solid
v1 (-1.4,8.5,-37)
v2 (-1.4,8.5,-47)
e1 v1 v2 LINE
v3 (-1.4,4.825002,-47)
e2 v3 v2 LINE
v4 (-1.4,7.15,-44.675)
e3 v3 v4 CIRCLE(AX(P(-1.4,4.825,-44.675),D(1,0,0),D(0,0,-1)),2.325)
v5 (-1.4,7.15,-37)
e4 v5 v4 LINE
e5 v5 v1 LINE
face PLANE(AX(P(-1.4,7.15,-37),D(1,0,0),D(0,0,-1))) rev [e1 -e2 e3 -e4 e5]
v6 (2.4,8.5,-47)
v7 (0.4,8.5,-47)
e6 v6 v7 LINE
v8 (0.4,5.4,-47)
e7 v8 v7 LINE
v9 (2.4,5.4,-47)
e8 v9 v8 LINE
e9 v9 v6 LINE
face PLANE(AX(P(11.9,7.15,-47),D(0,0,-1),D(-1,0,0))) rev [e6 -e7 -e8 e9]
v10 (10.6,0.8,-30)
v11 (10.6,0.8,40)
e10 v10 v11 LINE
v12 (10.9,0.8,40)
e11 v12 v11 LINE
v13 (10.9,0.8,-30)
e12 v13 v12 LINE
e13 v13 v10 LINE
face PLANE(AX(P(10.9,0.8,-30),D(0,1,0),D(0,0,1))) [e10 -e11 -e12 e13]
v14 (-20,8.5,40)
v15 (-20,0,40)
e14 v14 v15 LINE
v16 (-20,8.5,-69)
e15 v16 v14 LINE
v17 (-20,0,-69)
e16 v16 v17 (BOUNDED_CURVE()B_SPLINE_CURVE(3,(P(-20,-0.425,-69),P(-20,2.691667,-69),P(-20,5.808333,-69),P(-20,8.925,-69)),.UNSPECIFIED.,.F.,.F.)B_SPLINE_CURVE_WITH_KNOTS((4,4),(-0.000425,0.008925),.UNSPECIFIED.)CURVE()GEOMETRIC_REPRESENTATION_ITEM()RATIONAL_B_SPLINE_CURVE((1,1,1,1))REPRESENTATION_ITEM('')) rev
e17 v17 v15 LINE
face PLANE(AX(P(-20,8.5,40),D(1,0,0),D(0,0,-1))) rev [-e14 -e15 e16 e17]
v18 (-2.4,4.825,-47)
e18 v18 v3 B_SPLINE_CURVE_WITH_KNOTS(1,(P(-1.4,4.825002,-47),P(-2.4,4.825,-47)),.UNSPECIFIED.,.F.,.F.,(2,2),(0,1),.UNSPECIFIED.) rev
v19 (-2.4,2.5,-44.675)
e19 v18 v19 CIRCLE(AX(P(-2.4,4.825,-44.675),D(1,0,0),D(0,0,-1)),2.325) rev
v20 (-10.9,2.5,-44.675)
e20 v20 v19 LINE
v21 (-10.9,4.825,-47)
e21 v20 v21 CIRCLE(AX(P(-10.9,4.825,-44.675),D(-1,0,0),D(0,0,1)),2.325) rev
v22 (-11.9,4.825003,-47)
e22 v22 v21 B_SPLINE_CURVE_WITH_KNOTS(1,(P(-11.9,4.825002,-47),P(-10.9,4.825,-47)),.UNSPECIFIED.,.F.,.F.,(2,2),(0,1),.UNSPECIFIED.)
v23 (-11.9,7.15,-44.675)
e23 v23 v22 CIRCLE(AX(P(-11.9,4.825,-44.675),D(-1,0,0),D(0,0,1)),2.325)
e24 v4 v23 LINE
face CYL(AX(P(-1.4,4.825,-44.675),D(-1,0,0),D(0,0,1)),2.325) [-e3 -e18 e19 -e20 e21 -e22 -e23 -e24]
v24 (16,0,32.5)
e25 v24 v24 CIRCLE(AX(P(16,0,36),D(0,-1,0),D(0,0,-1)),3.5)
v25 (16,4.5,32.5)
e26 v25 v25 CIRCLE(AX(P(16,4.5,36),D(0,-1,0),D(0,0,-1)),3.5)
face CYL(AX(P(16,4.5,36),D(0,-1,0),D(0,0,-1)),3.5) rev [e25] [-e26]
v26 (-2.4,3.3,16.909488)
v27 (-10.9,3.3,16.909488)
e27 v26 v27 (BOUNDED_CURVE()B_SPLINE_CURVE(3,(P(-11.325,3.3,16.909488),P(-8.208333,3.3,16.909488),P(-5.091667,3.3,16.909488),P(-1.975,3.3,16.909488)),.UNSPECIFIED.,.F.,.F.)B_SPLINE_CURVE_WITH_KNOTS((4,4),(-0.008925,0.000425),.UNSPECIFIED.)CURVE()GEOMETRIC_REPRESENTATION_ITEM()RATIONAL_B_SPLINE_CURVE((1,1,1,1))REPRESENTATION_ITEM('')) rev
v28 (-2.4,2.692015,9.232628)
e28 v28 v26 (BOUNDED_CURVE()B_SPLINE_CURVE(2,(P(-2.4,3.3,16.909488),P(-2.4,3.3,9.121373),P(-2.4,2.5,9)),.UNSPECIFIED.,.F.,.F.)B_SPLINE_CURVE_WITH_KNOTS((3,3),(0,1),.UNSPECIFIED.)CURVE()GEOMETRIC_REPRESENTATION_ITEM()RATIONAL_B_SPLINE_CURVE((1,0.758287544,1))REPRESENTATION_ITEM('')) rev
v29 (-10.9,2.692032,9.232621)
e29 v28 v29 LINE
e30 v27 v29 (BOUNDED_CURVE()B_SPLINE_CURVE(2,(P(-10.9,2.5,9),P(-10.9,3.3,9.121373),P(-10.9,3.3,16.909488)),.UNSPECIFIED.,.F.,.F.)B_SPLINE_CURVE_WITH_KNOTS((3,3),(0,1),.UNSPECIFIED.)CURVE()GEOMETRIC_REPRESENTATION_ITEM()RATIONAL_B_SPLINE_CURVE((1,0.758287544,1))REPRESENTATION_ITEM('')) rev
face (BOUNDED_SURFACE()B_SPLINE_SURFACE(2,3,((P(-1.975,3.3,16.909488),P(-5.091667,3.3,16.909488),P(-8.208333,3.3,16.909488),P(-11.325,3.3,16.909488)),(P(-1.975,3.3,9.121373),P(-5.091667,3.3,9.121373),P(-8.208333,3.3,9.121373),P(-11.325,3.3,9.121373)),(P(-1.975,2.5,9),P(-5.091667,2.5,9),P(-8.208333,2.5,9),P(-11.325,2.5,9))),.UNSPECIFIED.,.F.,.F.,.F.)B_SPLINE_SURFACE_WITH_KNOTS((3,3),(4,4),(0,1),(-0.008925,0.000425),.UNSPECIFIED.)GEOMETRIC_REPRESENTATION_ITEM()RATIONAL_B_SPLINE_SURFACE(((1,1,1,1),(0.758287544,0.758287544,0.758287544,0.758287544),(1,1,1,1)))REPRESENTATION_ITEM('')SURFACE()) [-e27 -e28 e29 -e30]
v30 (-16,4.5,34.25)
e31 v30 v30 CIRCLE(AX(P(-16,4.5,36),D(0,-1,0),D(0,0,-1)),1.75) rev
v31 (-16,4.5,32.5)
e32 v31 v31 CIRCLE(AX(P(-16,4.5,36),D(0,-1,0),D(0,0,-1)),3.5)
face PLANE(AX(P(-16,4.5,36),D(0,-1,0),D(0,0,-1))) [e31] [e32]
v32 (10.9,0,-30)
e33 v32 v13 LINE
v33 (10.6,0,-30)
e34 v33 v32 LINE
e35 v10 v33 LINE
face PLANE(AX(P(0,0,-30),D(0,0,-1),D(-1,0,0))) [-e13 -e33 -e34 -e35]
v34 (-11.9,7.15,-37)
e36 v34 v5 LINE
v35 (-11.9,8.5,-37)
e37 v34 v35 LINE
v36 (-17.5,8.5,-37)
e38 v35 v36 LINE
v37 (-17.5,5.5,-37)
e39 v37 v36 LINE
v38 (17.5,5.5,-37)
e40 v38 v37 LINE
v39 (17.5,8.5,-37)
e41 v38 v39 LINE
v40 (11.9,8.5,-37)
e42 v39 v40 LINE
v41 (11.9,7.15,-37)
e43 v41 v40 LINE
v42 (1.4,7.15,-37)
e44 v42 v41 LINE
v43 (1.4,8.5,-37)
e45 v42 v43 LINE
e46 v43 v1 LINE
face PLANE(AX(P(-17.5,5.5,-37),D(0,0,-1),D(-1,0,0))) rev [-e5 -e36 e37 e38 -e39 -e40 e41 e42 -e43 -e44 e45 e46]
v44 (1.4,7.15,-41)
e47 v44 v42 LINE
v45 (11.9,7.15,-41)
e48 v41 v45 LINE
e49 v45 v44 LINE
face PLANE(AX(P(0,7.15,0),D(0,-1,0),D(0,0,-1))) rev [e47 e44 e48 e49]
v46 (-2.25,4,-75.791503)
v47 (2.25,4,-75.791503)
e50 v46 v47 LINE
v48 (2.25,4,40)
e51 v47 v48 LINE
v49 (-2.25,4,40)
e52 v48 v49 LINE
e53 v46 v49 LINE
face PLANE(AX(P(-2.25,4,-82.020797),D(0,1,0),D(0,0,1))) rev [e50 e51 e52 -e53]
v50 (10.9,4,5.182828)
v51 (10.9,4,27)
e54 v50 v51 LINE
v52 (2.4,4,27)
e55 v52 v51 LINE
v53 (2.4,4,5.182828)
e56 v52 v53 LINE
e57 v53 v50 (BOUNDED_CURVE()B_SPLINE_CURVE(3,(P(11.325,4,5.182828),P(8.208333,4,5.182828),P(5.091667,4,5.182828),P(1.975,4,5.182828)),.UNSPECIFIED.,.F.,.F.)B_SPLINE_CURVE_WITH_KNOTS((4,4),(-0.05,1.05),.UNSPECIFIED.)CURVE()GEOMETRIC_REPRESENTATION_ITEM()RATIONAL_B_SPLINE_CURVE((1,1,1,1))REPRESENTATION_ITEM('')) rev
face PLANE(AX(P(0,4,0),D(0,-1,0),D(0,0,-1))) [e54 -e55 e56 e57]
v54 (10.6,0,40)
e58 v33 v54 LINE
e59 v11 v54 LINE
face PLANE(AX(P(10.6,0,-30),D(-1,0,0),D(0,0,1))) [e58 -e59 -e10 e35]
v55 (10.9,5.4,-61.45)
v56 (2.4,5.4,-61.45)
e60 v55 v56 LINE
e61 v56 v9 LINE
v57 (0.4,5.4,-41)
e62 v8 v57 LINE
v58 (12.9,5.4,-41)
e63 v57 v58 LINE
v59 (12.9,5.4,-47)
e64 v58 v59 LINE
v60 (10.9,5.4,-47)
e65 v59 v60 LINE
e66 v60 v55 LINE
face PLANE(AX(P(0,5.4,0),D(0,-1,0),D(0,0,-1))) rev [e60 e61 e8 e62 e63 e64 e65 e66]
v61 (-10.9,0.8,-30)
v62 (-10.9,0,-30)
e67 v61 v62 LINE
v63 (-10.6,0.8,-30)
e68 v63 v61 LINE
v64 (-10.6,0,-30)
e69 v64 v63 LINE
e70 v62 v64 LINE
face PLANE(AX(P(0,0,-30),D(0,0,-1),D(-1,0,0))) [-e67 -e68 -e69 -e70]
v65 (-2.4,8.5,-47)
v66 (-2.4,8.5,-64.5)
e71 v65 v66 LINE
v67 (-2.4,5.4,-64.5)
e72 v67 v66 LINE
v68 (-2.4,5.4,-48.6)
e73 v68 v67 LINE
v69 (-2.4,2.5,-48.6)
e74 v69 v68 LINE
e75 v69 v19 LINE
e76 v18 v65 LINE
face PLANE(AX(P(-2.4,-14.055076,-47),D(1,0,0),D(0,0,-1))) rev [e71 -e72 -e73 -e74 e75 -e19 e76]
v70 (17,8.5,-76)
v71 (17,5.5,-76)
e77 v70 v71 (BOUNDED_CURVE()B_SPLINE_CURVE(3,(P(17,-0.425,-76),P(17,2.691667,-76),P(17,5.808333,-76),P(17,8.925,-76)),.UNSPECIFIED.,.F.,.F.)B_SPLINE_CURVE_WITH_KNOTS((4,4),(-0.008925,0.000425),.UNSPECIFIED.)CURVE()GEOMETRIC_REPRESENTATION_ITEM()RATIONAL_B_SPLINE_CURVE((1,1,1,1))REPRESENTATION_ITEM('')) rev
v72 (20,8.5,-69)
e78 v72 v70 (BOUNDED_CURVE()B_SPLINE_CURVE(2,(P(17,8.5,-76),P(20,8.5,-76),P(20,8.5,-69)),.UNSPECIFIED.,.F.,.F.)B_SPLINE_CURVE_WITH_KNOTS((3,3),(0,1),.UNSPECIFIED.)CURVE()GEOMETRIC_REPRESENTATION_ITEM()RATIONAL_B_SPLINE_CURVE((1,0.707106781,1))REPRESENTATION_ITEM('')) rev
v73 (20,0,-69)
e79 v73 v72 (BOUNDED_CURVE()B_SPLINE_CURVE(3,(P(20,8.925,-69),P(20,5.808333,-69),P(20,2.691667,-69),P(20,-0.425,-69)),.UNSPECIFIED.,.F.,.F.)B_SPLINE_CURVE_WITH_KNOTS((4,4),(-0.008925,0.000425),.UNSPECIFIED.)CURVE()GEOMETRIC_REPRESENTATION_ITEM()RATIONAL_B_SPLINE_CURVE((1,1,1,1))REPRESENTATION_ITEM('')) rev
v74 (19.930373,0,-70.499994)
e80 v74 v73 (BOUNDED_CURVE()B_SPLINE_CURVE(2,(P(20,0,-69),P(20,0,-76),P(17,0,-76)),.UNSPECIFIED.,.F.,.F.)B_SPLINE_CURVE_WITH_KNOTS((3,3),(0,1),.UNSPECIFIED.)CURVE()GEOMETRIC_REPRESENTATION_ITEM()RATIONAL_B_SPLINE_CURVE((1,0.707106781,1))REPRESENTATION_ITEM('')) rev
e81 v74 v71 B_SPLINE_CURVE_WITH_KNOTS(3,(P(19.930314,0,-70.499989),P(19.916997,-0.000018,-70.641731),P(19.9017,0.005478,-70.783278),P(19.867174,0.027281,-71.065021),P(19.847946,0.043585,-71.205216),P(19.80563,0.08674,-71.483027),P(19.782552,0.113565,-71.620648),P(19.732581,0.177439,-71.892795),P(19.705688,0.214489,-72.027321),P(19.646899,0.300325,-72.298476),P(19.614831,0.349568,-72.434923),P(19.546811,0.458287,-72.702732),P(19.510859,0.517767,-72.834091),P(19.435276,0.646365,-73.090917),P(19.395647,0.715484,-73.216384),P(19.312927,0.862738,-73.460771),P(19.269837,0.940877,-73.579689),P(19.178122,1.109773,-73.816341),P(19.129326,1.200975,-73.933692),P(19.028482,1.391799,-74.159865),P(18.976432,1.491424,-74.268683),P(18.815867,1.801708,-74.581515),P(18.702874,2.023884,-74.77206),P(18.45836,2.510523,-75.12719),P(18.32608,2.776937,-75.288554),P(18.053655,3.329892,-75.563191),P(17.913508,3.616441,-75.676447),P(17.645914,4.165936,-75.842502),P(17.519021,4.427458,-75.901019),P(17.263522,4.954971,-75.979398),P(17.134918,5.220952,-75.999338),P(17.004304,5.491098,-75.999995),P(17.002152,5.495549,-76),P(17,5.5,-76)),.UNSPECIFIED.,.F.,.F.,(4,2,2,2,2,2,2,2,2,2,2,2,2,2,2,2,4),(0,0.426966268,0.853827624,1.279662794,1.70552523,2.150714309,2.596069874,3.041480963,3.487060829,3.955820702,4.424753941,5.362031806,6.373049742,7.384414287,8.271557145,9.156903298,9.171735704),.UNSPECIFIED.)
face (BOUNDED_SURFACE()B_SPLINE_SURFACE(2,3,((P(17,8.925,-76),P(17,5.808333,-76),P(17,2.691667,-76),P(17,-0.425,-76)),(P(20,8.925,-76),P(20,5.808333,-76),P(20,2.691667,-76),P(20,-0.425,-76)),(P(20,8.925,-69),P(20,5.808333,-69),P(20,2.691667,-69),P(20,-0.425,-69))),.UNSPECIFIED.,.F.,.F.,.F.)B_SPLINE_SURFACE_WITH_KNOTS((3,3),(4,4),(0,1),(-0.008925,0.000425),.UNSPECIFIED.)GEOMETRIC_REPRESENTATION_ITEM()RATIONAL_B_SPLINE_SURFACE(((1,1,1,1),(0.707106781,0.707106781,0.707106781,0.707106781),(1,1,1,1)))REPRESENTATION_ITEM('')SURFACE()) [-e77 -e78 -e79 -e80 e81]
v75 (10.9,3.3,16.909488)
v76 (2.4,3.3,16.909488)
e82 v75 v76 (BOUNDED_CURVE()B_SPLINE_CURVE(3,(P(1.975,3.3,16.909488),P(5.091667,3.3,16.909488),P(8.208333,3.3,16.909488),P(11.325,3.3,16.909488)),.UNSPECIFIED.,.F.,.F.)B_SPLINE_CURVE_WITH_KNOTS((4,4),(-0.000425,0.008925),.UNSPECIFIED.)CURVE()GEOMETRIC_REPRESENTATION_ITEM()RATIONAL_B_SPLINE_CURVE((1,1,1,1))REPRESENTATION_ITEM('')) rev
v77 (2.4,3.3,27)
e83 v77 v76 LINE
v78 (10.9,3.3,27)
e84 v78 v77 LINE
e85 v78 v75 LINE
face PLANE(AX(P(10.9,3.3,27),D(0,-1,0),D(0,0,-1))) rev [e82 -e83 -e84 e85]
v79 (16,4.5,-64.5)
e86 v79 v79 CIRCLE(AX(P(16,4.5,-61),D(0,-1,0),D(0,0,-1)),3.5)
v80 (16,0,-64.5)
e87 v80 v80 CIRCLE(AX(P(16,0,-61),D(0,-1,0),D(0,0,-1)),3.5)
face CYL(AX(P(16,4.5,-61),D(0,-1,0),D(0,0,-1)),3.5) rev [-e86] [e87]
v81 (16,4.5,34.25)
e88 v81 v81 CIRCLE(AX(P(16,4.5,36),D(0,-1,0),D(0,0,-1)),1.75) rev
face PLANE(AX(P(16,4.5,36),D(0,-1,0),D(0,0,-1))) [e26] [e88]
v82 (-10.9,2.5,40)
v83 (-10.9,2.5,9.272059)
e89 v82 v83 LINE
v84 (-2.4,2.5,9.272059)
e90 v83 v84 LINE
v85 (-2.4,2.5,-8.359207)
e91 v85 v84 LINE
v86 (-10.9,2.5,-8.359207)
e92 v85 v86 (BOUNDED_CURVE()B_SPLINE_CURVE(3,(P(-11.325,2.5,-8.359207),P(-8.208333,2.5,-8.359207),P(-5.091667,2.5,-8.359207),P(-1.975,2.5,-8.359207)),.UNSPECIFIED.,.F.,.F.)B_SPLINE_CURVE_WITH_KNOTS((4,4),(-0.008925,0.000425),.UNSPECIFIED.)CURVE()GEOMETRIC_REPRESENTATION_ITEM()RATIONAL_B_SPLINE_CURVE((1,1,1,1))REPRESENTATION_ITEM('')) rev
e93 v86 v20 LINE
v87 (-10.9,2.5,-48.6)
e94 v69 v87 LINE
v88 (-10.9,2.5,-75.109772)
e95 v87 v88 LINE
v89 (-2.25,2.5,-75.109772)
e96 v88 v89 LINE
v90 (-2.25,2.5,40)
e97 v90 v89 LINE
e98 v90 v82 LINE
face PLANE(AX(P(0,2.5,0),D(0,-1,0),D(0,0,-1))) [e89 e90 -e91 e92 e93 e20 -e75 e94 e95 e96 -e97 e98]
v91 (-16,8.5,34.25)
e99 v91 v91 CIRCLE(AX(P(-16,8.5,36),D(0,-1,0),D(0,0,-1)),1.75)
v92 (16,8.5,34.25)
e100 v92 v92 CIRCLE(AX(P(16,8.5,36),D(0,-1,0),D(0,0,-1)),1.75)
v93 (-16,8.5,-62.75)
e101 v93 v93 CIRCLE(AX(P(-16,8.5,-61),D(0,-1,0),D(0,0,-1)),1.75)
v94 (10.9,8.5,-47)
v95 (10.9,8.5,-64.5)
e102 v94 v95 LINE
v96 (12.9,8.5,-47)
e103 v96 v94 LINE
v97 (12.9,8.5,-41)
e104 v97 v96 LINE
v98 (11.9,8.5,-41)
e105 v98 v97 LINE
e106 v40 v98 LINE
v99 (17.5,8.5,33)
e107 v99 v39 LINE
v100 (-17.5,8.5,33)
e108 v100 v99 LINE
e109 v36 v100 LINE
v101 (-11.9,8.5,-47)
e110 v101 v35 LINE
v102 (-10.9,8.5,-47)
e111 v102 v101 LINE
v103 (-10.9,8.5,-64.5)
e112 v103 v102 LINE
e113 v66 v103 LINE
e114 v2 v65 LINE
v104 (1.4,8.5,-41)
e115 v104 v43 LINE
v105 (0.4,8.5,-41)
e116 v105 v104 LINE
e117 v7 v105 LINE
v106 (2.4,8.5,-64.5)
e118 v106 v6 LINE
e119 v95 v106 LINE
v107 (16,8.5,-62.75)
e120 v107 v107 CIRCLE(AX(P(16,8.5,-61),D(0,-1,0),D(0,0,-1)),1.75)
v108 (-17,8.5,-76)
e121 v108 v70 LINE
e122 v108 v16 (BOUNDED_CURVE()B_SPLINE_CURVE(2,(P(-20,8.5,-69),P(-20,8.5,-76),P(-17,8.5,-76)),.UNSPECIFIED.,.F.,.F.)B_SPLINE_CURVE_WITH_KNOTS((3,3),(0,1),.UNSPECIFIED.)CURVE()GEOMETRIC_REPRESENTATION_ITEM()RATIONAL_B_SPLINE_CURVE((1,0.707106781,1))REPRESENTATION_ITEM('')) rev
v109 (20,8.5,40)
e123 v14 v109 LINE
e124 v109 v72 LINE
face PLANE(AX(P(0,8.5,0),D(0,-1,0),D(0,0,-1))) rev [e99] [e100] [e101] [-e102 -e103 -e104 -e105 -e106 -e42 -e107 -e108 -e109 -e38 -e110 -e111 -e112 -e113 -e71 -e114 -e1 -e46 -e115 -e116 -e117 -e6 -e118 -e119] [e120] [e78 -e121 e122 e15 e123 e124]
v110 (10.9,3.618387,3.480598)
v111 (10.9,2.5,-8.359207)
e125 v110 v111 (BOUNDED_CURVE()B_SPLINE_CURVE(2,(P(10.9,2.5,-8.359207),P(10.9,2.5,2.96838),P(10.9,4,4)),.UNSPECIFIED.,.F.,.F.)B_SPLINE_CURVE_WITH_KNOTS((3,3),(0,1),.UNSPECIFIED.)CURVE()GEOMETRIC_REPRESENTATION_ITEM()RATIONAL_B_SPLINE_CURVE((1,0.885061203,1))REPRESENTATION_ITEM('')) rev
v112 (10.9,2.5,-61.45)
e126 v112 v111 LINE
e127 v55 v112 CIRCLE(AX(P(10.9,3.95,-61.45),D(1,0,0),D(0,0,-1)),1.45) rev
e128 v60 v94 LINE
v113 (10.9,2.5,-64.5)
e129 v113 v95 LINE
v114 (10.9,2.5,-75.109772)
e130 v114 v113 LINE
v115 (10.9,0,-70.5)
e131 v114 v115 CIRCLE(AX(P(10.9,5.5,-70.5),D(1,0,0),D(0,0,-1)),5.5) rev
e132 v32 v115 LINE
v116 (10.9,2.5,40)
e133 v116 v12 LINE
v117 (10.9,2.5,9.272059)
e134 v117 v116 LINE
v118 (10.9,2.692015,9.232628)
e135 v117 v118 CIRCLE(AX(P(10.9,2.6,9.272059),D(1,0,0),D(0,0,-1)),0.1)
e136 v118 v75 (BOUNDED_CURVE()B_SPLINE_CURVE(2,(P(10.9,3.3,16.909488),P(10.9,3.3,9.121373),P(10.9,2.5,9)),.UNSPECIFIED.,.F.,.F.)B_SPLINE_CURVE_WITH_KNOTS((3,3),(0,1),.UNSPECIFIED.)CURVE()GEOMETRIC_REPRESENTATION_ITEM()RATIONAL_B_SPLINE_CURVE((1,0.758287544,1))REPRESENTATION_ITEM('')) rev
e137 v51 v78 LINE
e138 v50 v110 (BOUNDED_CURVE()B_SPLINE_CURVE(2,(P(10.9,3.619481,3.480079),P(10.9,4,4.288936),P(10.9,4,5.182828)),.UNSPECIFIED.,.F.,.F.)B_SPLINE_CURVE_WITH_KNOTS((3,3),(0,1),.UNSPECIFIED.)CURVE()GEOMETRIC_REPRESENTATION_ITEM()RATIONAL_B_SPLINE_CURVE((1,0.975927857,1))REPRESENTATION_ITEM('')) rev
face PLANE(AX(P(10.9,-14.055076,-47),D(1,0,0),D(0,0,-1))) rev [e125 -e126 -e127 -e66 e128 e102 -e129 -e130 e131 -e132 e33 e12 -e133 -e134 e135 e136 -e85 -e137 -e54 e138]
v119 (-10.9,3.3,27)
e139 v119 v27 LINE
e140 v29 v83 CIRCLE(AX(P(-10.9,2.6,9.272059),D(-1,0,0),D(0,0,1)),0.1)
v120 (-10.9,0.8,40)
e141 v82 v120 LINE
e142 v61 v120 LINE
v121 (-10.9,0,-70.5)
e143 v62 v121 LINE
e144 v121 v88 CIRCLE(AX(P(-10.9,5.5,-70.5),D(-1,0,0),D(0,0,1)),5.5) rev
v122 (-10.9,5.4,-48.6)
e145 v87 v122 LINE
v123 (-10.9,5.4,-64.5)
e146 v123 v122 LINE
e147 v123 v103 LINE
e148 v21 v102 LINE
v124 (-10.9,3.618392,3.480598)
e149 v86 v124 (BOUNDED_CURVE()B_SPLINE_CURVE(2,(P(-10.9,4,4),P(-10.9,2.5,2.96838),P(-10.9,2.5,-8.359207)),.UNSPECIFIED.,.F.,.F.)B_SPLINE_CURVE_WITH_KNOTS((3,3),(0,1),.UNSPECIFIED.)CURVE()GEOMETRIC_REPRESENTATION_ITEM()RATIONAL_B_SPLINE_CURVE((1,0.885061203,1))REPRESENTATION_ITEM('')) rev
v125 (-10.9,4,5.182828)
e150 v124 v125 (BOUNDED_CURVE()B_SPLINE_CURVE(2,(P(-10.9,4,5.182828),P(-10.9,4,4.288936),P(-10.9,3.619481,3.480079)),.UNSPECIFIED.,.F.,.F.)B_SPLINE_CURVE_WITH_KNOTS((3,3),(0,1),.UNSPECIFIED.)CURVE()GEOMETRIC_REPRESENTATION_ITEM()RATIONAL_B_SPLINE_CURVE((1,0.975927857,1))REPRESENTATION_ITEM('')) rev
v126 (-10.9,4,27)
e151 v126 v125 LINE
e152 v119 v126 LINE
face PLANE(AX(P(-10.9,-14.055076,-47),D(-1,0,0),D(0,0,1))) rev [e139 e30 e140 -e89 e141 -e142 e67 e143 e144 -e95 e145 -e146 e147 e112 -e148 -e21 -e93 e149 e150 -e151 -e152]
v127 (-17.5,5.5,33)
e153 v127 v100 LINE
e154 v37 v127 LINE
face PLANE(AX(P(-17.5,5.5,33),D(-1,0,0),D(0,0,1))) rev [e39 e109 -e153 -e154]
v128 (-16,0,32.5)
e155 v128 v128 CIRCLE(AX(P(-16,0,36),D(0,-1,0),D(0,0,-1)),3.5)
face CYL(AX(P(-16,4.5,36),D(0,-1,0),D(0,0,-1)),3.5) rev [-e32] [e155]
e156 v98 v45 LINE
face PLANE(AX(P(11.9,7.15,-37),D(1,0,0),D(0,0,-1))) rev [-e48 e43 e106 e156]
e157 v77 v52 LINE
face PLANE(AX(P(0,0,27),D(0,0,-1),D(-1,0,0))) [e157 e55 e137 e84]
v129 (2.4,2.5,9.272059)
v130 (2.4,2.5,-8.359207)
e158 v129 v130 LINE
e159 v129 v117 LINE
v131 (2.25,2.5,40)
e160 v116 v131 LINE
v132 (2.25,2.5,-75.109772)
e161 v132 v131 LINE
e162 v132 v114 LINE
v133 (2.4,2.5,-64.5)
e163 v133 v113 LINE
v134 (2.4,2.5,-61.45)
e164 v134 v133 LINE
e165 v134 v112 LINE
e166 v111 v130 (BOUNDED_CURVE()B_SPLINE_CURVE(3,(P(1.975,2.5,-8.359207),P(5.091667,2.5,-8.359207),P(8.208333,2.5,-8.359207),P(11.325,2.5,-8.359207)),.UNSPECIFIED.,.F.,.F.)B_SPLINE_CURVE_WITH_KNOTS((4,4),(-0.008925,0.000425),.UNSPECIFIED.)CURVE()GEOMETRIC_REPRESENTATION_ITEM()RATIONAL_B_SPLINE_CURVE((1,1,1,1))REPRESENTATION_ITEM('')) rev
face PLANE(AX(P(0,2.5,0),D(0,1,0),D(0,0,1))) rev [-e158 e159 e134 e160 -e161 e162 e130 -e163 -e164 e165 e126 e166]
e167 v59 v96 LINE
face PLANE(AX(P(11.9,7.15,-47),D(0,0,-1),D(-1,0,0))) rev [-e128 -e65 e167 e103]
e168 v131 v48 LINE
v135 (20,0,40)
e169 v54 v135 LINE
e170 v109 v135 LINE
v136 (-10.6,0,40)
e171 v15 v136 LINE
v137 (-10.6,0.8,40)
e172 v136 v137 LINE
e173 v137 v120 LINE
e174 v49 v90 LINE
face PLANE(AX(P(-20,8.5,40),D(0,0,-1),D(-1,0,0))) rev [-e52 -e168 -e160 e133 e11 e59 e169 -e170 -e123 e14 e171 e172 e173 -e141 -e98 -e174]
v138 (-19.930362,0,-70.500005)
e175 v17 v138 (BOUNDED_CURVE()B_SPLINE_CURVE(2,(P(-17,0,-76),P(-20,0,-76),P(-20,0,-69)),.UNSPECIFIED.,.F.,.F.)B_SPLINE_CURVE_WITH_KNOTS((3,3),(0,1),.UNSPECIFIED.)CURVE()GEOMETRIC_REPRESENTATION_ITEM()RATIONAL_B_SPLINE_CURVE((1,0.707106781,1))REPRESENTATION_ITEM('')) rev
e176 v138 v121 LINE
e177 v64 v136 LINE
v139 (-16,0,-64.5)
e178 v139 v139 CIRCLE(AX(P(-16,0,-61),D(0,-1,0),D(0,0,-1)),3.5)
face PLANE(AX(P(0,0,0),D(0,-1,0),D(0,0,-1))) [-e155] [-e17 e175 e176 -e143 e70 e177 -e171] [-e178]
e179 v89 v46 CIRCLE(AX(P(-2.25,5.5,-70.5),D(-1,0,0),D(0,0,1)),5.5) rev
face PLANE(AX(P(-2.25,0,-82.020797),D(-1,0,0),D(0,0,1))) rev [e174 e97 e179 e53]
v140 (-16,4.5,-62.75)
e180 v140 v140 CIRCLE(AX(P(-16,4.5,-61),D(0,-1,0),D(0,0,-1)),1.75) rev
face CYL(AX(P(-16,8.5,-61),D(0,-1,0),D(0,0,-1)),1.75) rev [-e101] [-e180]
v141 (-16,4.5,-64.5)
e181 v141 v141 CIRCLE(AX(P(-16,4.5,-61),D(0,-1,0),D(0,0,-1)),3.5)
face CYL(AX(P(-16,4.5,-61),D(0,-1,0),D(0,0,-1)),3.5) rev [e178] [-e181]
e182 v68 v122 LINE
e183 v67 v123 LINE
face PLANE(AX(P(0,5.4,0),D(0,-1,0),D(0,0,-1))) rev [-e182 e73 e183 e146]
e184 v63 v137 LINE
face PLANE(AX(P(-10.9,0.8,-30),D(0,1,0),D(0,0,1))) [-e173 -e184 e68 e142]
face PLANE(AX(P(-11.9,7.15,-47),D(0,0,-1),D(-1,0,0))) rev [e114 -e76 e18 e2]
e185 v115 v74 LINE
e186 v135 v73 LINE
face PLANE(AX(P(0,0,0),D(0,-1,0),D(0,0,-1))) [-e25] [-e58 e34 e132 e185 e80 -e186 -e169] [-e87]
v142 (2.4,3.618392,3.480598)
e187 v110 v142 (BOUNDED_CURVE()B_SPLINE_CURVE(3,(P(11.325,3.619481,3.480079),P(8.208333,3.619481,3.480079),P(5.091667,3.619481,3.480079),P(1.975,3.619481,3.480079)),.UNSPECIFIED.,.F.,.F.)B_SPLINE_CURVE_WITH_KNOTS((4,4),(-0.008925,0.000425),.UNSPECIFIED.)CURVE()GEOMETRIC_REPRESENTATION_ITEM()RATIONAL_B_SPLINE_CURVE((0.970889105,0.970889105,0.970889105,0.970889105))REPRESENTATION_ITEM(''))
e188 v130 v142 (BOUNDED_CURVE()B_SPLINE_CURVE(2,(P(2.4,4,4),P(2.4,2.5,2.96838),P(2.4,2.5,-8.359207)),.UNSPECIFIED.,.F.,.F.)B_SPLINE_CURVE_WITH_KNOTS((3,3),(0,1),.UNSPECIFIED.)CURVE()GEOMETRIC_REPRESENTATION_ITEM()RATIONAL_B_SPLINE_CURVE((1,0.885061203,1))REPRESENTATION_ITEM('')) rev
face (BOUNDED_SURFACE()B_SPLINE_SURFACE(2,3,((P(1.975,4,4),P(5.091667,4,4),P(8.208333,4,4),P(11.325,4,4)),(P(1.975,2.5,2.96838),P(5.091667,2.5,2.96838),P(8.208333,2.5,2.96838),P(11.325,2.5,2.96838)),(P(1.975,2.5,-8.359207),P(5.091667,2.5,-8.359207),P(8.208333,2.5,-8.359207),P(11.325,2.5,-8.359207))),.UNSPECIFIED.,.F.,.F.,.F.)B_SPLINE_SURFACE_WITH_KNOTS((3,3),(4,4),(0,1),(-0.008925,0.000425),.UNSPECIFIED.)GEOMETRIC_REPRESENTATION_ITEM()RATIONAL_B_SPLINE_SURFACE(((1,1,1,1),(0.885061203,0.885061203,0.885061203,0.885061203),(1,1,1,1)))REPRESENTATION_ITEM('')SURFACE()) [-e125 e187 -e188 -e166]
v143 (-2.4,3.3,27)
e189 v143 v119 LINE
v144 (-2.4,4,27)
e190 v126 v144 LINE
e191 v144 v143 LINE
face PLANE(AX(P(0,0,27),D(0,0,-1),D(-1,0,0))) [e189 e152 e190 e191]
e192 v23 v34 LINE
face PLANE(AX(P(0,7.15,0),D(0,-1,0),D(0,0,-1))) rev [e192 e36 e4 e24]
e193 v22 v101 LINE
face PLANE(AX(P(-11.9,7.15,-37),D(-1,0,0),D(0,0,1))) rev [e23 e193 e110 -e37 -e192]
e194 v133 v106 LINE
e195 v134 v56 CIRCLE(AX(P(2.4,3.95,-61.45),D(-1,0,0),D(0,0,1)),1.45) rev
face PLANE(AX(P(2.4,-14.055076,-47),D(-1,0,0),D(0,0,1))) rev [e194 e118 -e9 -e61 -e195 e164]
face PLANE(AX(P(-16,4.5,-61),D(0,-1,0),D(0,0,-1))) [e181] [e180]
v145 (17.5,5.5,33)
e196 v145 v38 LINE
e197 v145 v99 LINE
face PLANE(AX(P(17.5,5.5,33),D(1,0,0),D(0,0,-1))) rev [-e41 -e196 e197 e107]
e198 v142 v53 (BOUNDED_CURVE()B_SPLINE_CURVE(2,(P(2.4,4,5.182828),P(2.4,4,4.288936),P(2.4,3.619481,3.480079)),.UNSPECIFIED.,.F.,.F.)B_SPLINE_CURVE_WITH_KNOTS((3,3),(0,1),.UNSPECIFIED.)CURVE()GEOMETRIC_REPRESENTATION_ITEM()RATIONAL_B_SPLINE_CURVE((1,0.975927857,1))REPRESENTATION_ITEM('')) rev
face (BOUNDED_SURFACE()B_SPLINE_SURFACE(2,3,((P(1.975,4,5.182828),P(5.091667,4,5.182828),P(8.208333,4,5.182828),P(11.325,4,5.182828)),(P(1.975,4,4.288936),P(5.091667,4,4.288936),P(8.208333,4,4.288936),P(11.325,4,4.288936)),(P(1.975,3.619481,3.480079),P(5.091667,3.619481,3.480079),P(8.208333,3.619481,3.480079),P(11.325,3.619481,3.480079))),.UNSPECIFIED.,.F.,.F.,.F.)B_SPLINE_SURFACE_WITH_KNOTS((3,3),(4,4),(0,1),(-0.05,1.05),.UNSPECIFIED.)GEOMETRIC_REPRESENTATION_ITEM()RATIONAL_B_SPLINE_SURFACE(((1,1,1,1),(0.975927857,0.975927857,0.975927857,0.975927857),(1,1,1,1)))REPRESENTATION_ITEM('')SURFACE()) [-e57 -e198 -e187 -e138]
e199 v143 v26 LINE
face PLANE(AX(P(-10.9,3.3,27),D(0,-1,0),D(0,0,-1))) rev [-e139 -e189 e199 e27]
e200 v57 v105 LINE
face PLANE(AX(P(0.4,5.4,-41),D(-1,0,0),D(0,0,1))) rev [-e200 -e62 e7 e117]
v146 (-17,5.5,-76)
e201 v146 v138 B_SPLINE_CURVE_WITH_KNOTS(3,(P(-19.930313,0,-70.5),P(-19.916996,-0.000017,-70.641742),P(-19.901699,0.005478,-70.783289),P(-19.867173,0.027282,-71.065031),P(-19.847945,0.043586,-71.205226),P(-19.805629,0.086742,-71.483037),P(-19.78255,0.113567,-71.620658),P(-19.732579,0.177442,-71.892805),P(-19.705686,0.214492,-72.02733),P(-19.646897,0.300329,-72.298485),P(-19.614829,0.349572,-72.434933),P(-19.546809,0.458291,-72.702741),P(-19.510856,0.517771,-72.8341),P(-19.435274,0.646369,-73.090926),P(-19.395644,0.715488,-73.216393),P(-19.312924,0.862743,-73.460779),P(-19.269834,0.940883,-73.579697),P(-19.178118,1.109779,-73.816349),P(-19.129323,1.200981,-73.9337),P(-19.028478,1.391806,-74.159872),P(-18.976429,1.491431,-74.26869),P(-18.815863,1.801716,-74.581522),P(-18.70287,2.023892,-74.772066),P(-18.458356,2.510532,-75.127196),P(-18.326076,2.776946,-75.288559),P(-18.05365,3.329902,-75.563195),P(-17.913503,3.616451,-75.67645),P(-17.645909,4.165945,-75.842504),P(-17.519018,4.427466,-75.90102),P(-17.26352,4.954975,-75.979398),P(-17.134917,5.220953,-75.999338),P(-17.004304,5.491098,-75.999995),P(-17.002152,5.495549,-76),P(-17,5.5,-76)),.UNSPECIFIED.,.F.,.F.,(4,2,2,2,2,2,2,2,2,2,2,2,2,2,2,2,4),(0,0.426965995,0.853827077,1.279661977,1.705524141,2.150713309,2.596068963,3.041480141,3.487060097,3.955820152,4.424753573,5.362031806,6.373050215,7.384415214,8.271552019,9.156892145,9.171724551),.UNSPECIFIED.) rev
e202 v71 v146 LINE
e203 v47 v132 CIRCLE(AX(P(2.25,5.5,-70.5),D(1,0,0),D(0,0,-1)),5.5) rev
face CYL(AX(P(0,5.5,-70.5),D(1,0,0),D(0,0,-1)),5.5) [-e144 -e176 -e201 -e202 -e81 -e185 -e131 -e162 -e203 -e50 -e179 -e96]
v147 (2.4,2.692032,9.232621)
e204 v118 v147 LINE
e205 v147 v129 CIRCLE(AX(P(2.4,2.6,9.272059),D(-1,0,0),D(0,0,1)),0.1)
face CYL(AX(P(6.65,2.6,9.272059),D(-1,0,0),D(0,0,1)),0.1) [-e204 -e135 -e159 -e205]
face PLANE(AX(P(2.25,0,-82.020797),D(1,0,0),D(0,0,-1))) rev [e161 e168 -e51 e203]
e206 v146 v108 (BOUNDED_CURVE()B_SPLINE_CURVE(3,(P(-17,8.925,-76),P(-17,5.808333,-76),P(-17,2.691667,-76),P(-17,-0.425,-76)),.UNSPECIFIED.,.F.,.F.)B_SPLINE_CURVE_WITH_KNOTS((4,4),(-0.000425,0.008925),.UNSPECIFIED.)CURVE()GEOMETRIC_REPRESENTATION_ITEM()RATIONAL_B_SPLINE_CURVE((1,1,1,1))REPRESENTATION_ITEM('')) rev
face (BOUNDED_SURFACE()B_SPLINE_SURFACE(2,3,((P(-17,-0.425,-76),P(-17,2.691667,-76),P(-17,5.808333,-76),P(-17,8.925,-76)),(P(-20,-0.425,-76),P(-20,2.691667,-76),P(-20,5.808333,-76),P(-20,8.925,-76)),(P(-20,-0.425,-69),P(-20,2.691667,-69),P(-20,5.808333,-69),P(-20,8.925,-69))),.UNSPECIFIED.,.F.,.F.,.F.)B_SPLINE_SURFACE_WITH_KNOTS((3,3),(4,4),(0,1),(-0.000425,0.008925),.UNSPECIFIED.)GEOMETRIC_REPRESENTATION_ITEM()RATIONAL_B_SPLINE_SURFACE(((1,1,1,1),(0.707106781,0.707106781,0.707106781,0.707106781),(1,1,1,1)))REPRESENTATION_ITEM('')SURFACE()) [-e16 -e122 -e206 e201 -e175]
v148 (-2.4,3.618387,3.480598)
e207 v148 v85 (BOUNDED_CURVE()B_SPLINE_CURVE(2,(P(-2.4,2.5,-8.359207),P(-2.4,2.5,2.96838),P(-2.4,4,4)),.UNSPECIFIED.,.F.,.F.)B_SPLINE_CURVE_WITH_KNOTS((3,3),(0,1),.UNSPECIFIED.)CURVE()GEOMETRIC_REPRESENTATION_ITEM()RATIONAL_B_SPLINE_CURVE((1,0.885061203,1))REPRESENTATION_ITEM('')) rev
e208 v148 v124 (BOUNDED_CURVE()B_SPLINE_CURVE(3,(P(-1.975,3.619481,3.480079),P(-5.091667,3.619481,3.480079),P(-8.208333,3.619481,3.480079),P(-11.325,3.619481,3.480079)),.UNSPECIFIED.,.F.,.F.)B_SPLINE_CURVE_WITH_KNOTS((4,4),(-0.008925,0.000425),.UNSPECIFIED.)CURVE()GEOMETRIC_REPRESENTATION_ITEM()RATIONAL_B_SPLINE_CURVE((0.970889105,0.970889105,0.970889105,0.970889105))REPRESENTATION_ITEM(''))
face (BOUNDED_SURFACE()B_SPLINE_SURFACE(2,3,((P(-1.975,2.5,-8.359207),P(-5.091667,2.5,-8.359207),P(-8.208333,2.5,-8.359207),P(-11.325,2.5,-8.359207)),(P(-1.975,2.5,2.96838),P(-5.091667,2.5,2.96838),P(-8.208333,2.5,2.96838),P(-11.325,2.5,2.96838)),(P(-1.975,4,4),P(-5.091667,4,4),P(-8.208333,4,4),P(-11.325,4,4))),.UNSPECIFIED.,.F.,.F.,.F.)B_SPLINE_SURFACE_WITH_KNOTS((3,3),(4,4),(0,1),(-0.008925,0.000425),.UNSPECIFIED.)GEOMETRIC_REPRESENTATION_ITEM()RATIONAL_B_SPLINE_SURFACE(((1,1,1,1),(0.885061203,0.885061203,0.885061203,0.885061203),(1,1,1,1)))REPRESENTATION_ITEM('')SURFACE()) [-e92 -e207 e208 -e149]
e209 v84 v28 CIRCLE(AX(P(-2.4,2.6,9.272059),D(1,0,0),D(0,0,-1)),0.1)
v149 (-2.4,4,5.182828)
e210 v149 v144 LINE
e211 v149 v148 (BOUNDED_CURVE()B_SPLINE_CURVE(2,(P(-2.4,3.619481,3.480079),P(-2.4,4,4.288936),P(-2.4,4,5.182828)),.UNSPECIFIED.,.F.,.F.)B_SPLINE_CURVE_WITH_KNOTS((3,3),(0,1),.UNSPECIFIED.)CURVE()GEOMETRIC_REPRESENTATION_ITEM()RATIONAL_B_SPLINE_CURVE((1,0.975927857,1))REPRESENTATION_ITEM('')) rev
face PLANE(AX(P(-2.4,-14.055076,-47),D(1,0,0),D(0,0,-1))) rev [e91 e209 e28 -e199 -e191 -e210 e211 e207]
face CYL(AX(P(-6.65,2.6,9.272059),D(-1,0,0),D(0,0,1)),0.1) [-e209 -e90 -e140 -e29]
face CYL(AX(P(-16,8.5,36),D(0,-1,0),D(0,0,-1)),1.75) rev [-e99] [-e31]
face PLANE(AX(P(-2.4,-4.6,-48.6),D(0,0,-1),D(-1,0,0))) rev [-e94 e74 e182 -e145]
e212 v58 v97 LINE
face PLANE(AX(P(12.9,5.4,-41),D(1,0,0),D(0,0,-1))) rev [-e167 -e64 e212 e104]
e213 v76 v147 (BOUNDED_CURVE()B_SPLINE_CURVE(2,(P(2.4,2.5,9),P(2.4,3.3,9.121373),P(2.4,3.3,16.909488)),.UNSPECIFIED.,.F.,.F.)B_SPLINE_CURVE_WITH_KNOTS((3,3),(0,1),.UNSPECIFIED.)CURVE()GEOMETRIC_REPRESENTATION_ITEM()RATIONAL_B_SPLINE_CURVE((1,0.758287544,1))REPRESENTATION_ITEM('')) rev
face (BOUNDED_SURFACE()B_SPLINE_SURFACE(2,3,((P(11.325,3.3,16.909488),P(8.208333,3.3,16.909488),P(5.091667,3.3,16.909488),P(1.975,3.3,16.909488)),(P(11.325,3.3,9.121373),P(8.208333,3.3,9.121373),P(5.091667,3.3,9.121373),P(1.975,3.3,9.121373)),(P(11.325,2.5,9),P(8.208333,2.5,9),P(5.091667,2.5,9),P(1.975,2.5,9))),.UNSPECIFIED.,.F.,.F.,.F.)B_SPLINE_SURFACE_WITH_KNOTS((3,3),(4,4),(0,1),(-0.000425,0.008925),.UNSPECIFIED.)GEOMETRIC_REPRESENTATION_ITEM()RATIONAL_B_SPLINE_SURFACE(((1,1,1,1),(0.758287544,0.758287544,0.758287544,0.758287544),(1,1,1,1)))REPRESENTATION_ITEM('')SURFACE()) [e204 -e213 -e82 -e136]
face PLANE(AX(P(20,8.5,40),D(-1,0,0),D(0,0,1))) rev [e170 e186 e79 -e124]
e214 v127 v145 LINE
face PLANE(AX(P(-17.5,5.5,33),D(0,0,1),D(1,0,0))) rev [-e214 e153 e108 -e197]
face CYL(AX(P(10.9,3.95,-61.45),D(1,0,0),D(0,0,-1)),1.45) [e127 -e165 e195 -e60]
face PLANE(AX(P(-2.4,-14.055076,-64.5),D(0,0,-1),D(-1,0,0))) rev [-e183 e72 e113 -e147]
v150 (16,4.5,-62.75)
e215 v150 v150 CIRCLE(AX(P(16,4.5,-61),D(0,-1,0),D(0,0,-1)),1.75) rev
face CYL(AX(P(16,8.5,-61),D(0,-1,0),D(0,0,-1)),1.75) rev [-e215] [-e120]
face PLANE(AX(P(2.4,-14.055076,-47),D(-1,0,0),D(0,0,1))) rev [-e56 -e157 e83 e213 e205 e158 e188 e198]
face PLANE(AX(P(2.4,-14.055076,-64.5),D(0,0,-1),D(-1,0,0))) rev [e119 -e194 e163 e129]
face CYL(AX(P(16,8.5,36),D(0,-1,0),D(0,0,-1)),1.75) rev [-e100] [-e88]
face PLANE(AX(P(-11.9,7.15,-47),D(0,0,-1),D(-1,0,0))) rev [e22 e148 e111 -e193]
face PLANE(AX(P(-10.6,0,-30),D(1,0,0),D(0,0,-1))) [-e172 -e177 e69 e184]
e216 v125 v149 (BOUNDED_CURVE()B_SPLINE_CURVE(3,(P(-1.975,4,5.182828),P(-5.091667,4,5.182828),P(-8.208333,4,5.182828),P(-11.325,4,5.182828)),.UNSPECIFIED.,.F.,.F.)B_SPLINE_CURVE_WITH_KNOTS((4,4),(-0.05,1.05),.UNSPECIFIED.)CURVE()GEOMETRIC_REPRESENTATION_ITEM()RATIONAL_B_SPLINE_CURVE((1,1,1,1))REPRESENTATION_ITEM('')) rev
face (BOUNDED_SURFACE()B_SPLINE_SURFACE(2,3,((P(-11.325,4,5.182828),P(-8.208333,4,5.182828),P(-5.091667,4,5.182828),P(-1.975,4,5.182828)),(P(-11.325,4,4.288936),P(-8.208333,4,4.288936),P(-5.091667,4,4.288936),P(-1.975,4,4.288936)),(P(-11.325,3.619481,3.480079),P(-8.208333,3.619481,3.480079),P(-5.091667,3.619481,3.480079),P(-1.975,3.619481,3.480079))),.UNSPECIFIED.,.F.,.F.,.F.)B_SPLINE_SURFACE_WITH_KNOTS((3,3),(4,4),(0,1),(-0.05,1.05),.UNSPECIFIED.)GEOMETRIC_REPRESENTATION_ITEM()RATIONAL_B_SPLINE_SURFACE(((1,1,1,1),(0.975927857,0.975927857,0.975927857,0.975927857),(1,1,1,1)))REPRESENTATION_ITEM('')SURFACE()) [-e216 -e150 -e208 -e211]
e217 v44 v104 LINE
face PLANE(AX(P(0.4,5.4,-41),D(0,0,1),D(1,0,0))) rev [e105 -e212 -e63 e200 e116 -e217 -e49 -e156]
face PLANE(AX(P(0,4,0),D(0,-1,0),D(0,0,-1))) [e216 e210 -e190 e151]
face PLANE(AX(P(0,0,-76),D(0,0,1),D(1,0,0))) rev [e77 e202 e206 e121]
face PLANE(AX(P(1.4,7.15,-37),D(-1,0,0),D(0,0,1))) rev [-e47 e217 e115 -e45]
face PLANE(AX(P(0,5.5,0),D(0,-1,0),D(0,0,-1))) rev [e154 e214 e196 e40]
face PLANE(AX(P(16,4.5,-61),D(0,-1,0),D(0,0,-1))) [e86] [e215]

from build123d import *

# Parameters (mm, degrees)
SKETCH1_W                  = 40
SKETCH1_H                  = 106
BOSS_EXTRUDE1_DEPTH        = 8.5
SKETCH2_W                  = 35
SKETCH2_H                  = 70
CUT_EXTRUDE1_DEPTH         = 3
SKETCH3_W                  = 10.5
SKETCH3_H                  = 10
CUT_EXTRUDE2_DEPTH         = 1.35
SKETCH4_W                  = 12.5
SKETCH4_H                  = 6
CUT_EXTRUDE3_DEPTH         = 3.1
SKETCH5_W                  = 8.5
SKETCH5_H                  = 17.5
PCB_PLACE_DEPTH            = 3.1
SKETCH6_W                  = 8.5
SKETCH6_H                  = 1.6
NICKEL_STRIP_HOLE_DEPTH    = 70.174850921
CUT_EXTRUDE4_REACH         = 71.486
SKETCH7_W                  = 8.5
SKETCH7_H                  = 17.5
SKETCH8_W                  = 8.5
SKETCH8_H                  = 1.6
CUT_EXTRUDE5_DEPTH         = 10
SKETCH9_W                  = 8.5
SKETCH9_H                  = 106
NICKEL_STRIP_RAIL_DEPTH    = 2.5
FILLET3_R                  = 2.325
FILLET4_RADIUS             = 1.45
FILLET4_LENGTH             = 8.5
SKETCH10_W                 = 8.5
SKETCH10_H                 = 5
CUT_EXTRUDE6_DEPTH         = 1.5
SKETCH11_W                 = 8.5
SKETCH11_H                 = 0.7
NICKELSTRIPINSERTION_DEPTH = 18
FILLET5_INSERTION_START    = -10.9
FILLET5_INSERTION_DEPTH    = 8.5
FILLET5_INSERTION_START_2  = 2.4
FILLET5_INSERTION_2_DEPTH  = 8.5
FILLET7_AMEND_R            = 4
FILLET6_START              = -10.9
FILLET6_DEPTH              = 8.5
FILLET6_START_2            = 2.4
FILLET6_2_DEPTH            = 8.5
FILLET8_ROUNDING_R         = 0.1
SKETCH12_W                 = 0.3
SKETCH12_H                 = 0.8
STRIPRAIL_DEPTH            = 70
SKETCH13_R                 = 1.75
SCREW_HOLES_DEPTH          = 70.485610128
SKETCH14_R                 = 3.5
SCREW_HEAD_HOLES_TBM_DEPTH = 4.5
BOSS_EXTRUDE2_DEPTH        = 10
FILLET12_SIZE              = 7
FILLET12_SIZE_2            = 3
FILLET11_R                 = 5.5
SKETCH17_W                 = 4.5
SKETCH17_H                 = 4
CUT_EXTRUDE9_DEPTH         = 116
SKETCH18_W                 = 5.4
SKETCH18_H                 = 2.5
CUT_EXTRUDE10_DEPTH        = 116


with BuildPart() as part:
    # Sketch1 → Boss-Extrude1 (new body)
    with BuildSketch(Plane(origin=(0, 0, 0), x_dir=(1, 0, 0), z_dir=(0, 1, 0))):
        with Locations((0, 13)):
            Rectangle(SKETCH1_W, SKETCH1_H)
    extrude(amount=BOSS_EXTRUDE1_DEPTH)

    # Sketch2 → Cut-Extrude1 (cut)
    with BuildSketch(Plane(origin=(0, 8.5, 0), x_dir=(1, 0, 0), z_dir=(0, 1, 0))):
        with Locations((0, 2)):
            Rectangle(SKETCH2_W, SKETCH2_H)
    extrude(amount=-CUT_EXTRUDE1_DEPTH, mode=Mode.SUBTRACT)

    # Sketch3 → Cut-Extrude2 (cut)
    with BuildSketch(Plane(origin=(0, 8.5, 0), x_dir=(1, 0, 0), z_dir=(0, 1, 0))):
        with Locations((-6.65, 42)):
            Rectangle(SKETCH3_W, SKETCH3_H)
        with Locations((6.65, 42)):
            Rectangle(SKETCH3_W, SKETCH3_H)
    extrude(amount=-CUT_EXTRUDE2_DEPTH, mode=Mode.SUBTRACT)

    # Sketch4 → Cut-Extrude3 (cut)
    with BuildSketch(Plane(origin=(0, 8.5, 0), x_dir=(1, 0, 0), z_dir=(0, 1, 0))):
        with Locations((6.65, 44)):
            Rectangle(SKETCH4_W, SKETCH4_H)
    extrude(amount=-CUT_EXTRUDE3_DEPTH, mode=Mode.SUBTRACT)

    # Sketch5 → PCB place (cut)
    with BuildSketch(Plane(origin=(0, 8.5, 0), x_dir=(1, 0, 0), z_dir=(0, 1, 0))):
        with Locations((6.65, 55.75)):
            Rectangle(SKETCH5_W, SKETCH5_H)
    extrude(amount=-PCB_PLACE_DEPTH, mode=Mode.SUBTRACT)

    # Sketch6 → Nickel strip hole (cut, through all)
    with BuildSketch(Plane(origin=(0, 5.4, 0), x_dir=(1, 0, 0), z_dir=(0, 1, 0))):
        with Locations((6.65, 63.7)):
            Rectangle(SKETCH6_W, SKETCH6_H)
    extrude(amount=-NICKEL_STRIP_HOLE_DEPTH, mode=Mode.SUBTRACT)

    # Cut-Extrude4: up to this face of the body (flat: up to its plane)
    cut_extrude4_end = Plane(part.part.faces().sort_by_distance((6.65, 5.4, -51.042077088))[0])
    # Sketch7 → Cut-Extrude4 (cut, up to the picked face)
    with BuildSketch(Plane(origin=(0, 8.5, 0), x_dir=(1, 0, 0), z_dir=(0, 1, 0)), mode=Mode.PRIVATE) as cut_extrude4_sk1:
        with Locations((-6.65, 55.75)):
            Rectangle(SKETCH7_W, SKETCH7_H)
    cut_extrude4_tool1 = split(extrude(cut_extrude4_sk1.sketch, amount=-CUT_EXTRUDE4_REACH, mode=Mode.PRIVATE), bisect_by=cut_extrude4_end, keep=Keep.BOTH, mode=Mode.PRIVATE)
    add(cut_extrude4_tool1.solids().sort_by(Axis((-6.65, 8.5, -55.75), (0, -1, 0)))[0], mode=Mode.SUBTRACT)

    # Sketch8 → Cut-Extrude5 (cut)
    with BuildSketch(Plane(origin=(0, 5.4, 0), x_dir=(1, 0, 0), z_dir=(0, 1, 0))):
        with Locations((-6.65, 47.8)):
            Rectangle(SKETCH8_W, SKETCH8_H)
    extrude(amount=-CUT_EXTRUDE5_DEPTH, mode=Mode.SUBTRACT)

    # Sketch9 → Nickel strip rail (cut)
    with BuildSketch(Plane.XZ):
        with Locations((-6.65, -13)):
            Rectangle(SKETCH9_W, SKETCH9_H)
        with Locations((6.65, -13)):
            Rectangle(SKETCH9_W, SKETCH9_H)
    extrude(amount=-NICKEL_STRIP_RAIL_DEPTH, mode=Mode.SUBTRACT)

    # Fillet3
    # the kernel refuses this fillet: 2.325 mm, written as the material it takes off along each edge
    with BuildSketch(Plane(origin=(3.4125, 7.15, -47), x_dir=(0, 0, 1), z_dir=(-1, 0, 0))) as fillet3_piece_1_section:
        with BuildLine():
            CenterArc((FILLET3_R, -FILLET3_R), FILLET3_R, 90, 90)
            Line((0, -FILLET3_R), (0, 0))
            Line((0, 0), (FILLET3_R, 0))
        make_face()
    fillet3_piece_1 = extrude(amount=20.125, mode=Mode.PRIVATE)
    fillet3_piece_1 = split(fillet3_piece_1, bisect_by=Plane(origin=(-11.9, 7.15, -47), z_dir=(1, 0, 0)), keep=Keep.TOP, mode=Mode.PRIVATE)
    fillet3_piece_1 = split(fillet3_piece_1, bisect_by=Plane(origin=(-1.4, 7.15, -47), z_dir=(-1, 0, 0)), keep=Keep.TOP, mode=Mode.PRIVATE)
    add(fillet3_piece_1, mode=Mode.SUBTRACT)
    with BuildSketch(Plane(origin=(-10.9, 2.5, -47), x_dir=(0, 1, 0), z_dir=(1, 0, 0))) as fillet3_piece_2:
        with BuildLine():
            CenterArc((FILLET3_R, FILLET3_R), FILLET3_R, 180, 90)
            Line((0, FILLET3_R), (0, 0))
            Line((0, 0), (FILLET3_R, 0))
        make_face()
    extrude(amount=8.5, mode=Mode.SUBTRACT)

    # Fillet4: full round fillet: the end face becomes a half cylinder, R = half its width
    fillet4_face = Plane((6.65, 3.95, -62.9), x_dir=(1, 0, 0), z_dir=(0, 0, -1))  # on the end face: x along it, z out of the body
    fillet4_slab = fillet4_face.offset(-FILLET4_RADIUS / 2) * Box(FILLET4_LENGTH, 2 * FILLET4_RADIUS, FILLET4_RADIUS, mode=Mode.PRIVATE)  # the body's end, R deep
    fillet4_round = Plane((6.65, 3.95, -61.45), x_dir=(0, 0, -1), z_dir=(1, 0, 0)) * Cylinder(FILLET4_RADIUS, FILLET4_LENGTH, mode=Mode.PRIVATE)  # its axis R under the face
    add(fillet4_slab - fillet4_round, mode=Mode.SUBTRACT)

    # Sketch10 → Cut-Extrude6 (cut)
    with BuildSketch(Plane.XZ.offset(-2.5)):
        with Locations((6.65, 6.5)):
            Rectangle(SKETCH10_W, SKETCH10_H)
        with Locations((-6.65, 6.5)):
            Rectangle(SKETCH10_W, SKETCH10_H)
    extrude(amount=-CUT_EXTRUDE6_DEPTH, mode=Mode.SUBTRACT)

    # Sketch11 → NickelStripInsertion (cut)
    with BuildSketch(Plane(origin=(0, 0, 9), x_dir=(-1, 0, 0), z_dir=(0, 0, -1))):
        with Locations((-6.65, 3.65)):
            Rectangle(SKETCH11_W, SKETCH11_H)
        with Locations((6.65, 3.65)):
            Rectangle(SKETCH11_W, SKETCH11_H)
    extrude(amount=-NICKELSTRIPINSERTION_DEPTH, mode=Mode.SUBTRACT)

    # Fillet5_insertion: read off the stored shape, not the designer's step
    # Fillet5_insertion outline → Fillet5_insertion (cut)
    with BuildSketch(Plane.YZ.offset(FILLET5_INSERTION_START)):
        with BuildLine():
            Line((2.5, 4), (2.5, -8.359207094))
            add(Edge.make_bspline(
                [(2.5, -8.359207094), (2.5, 2.968380423), (4, 4)],
                knots=[0, 0, 0, 1, 1, 1], degree=2, weights=[1, 0.885061203, 1]))
            Line((4, 4), (2.5, 4))
        make_face()
    extrude(amount=FILLET5_INSERTION_DEPTH, mode=Mode.SUBTRACT)

    # Fillet5_insertion 2 outline → Fillet5_insertion 2 (cut)
    with BuildSketch(Plane.YZ.offset(FILLET5_INSERTION_START_2)):
        with BuildLine():
            Line((2.5, 4), (2.5, -8.359207094))
            add(Edge.make_bspline(
                [(2.5, -8.359207094), (2.5, 2.968380423), (4, 4)],
                knots=[0, 0, 0, 1, 1, 1], degree=2, weights=[1, 0.885061203, 1]))
            Line((4, 4), (2.5, 4))
        make_face()
    extrude(amount=FILLET5_INSERTION_2_DEPTH, mode=Mode.SUBTRACT)

    # Fillet7_amend
    fillet7_amend_edges = [part.edges().sort_by_distance(p)[0] for p in [
        (6.65, 4, 4),
        (-6.65, 4, 4),
    ]]
    fillet(fillet7_amend_edges, radius=FILLET7_AMEND_R)

    # Fillet6: read off the stored shape, not the designer's step
    # Fillet6 outline → Fillet6 (cut)
    with BuildSketch(Plane.YZ.offset(FILLET6_START)):
        with BuildLine():
            Line((3.3, 9), (3.3, 16.909487973))
            add(Edge.make_bspline(
                [(3.3, 16.909487973), (3.3, 9.121373217), (2.5, 9)],
                knots=[0, 0, 0, 1, 1, 1], degree=2, weights=[1, 0.758287544, 1]))
            Line((2.5, 9), (3.3, 9))
        make_face()
    extrude(amount=FILLET6_DEPTH, mode=Mode.SUBTRACT)

    # Fillet6 2 outline → Fillet6 2 (cut)
    with BuildSketch(Plane.YZ.offset(FILLET6_START_2)):
        with BuildLine():
            Line((3.3, 9), (3.3, 16.909487973))
            add(Edge.make_bspline(
                [(3.3, 16.909487973), (3.3, 9.121373217), (2.5, 9)],
                knots=[0, 0, 0, 1, 1, 1], degree=2, weights=[1, 0.758287544, 1]))
            Line((2.5, 9), (3.3, 9))
        make_face()
    extrude(amount=FILLET6_2_DEPTH, mode=Mode.SUBTRACT)

    # Fillet8_rounding
    fillet8_rounding_edges = [part.edges().sort_by_distance(p)[0] for p in [
        (-6.65, 2.5, 9),
        (6.65, 2.5, 9),
    ]]
    fillet(fillet8_rounding_edges, radius=FILLET8_ROUNDING_R)

    # Sketch12 → StripRail (add)
    with BuildSketch(Plane.XY.offset(40)):
        with Locations((2.55, 0.4)):
            Rectangle(SKETCH12_W, SKETCH12_H)
        with Locations((-10.75, 0.4)):
            Rectangle(SKETCH12_W, SKETCH12_H)
        with Locations((-2.55, 0.4)):
            Rectangle(SKETCH12_W, SKETCH12_H)
        with Locations((10.75, 0.4)):
            Rectangle(SKETCH12_W, SKETCH12_H)
    extrude(amount=-STRIPRAIL_DEPTH)

    # Sketch13 → Screw_Holes (cut, through all)
    with BuildSketch(Plane.XZ):
        with Locations(Location((-16, -61, 0), (0, 0, 270))):
            Circle(SKETCH13_R)
        with Locations(Location((16, -61, 0), (0, 0, 270))):
            Circle(SKETCH13_R)
        with Locations(Location((-16, 36, 0), (0, 0, 270))):
            Circle(SKETCH13_R)
        with Locations(Location((16, 36, 0), (0, 0, 270))):
            Circle(SKETCH13_R)
    extrude(amount=-SCREW_HOLES_DEPTH, mode=Mode.SUBTRACT)

    # Sketch14 → Screw_Head_Holes_TBM (cut)
    with BuildSketch(Plane.XZ):
        with Locations(Location((16, -61, 0), (0, 0, 270))):
            Circle(SKETCH14_R)
        with Locations(Location((-16, -61, 0), (0, 0, 270))):
            Circle(SKETCH14_R)
        with Locations(Location((16, 36, 0), (0, 0, 270))):
            Circle(SKETCH14_R)
        with Locations(Location((-16, 36, 0), (0, 0, 270))):
            Circle(SKETCH14_R)
    extrude(amount=-SCREW_HEAD_HOLES_TBM_DEPTH, mode=Mode.SUBTRACT)

    # Sketch15 → Boss-Extrude2 (add)
    with BuildSketch(Plane(origin=(0, 0, -66), x_dir=(-1, 0, 0), z_dir=(0, 0, -1))):
        Polygon((-20, 0), (-20, 8.5), (20, 8.5), (20, 0), (10.9, 0), (10.9, 2.5), (2.4, 2.5), (2.4, 0), (-2.4, 0), (-2.4, 2.5), (-10.9, 2.5), (-10.9, 0), align=None)
    extrude(amount=BOSS_EXTRUDE2_DEPTH)

    # Fillet12
    # a fillet whose section is not a circle: 7, 3 mm, written as the material it takes off along each edge
    with BuildSketch(Plane(origin=(20, -17.5, -76), x_dir=(0, 0, 1), z_dir=(0, 1, 0)), Plane(origin=(-20, 26, -76), x_dir=(0, 0, 1), z_dir=(0, -1, 0))) as fillet12_piece_1:
        with BuildLine():
            Bezier((FILLET12_SIZE, 0), (0, 0), (0, -FILLET12_SIZE_2), weights=[1, 0.707106781, 1])
            Line((0, -FILLET12_SIZE_2), (0, 0))
            Line((0, 0), (FILLET12_SIZE, 0))
        make_face()
    extrude(amount=43.5, mode=Mode.SUBTRACT)

    # Fillet11
    # the kernel refuses this fillet: 5.5 mm, written as the material it takes off along each edge
    with BuildSketch(Plane(origin=(-16.15, 0, -76), x_dir=(0, 1, 0), z_dir=(1, 0, 0))) as fillet11_piece_1:
        with BuildLine():
            CenterArc((FILLET11_R, FILLET11_R), FILLET11_R, 180, 90)
            Line((0, FILLET11_R), (0, 0))
            Line((0, 0), (FILLET11_R, 0))
        make_face()
    extrude(amount=32.3, mode=Mode.SUBTRACT)
    with BuildSketch(Plane(origin=(-30.75, 0, -76), x_dir=(0, 0, 1), z_dir=(1, 0, 0))) as fillet11_piece_2:
        with BuildLine():
            CenterArc((FILLET11_R, -FILLET11_R), FILLET11_R, 90, 90)
            Line((0, -FILLET11_R), (0, 0))
            Line((0, 0), (FILLET11_R, 0))
        make_face()
    extrude(amount=33.6, mode=Mode.SUBTRACT)
    with BuildSketch(Plane(origin=(-2.85, 0, -76), x_dir=(0, 1, 0), z_dir=(1, 0, 0))) as fillet11_piece_3:
        with BuildLine():
            CenterArc((FILLET11_R, FILLET11_R), FILLET11_R, 180, 90)
            Line((0, FILLET11_R), (0, 0))
            Line((0, 0), (FILLET11_R, 0))
        make_face()
    extrude(amount=33.6, mode=Mode.SUBTRACT)

    # Sketch17 → Cut-Extrude9 (cut)
    with BuildSketch(Plane.XY.offset(40)):
        with Locations((0, 2)):
            Rectangle(SKETCH17_W, SKETCH17_H)
    extrude(amount=-CUT_EXTRUDE9_DEPTH, mode=Mode.SUBTRACT)

    # Sketch18 → Cut-Extrude10 (cut)
    with BuildSketch(Plane.XY.offset(40)):
        with Locations((0, 1.25)):
            Rectangle(SKETCH18_W, SKETCH18_H)
    extrude(amount=-CUT_EXTRUDE10_DEPTH, mode=Mode.SUBTRACT)


solid = part.part
